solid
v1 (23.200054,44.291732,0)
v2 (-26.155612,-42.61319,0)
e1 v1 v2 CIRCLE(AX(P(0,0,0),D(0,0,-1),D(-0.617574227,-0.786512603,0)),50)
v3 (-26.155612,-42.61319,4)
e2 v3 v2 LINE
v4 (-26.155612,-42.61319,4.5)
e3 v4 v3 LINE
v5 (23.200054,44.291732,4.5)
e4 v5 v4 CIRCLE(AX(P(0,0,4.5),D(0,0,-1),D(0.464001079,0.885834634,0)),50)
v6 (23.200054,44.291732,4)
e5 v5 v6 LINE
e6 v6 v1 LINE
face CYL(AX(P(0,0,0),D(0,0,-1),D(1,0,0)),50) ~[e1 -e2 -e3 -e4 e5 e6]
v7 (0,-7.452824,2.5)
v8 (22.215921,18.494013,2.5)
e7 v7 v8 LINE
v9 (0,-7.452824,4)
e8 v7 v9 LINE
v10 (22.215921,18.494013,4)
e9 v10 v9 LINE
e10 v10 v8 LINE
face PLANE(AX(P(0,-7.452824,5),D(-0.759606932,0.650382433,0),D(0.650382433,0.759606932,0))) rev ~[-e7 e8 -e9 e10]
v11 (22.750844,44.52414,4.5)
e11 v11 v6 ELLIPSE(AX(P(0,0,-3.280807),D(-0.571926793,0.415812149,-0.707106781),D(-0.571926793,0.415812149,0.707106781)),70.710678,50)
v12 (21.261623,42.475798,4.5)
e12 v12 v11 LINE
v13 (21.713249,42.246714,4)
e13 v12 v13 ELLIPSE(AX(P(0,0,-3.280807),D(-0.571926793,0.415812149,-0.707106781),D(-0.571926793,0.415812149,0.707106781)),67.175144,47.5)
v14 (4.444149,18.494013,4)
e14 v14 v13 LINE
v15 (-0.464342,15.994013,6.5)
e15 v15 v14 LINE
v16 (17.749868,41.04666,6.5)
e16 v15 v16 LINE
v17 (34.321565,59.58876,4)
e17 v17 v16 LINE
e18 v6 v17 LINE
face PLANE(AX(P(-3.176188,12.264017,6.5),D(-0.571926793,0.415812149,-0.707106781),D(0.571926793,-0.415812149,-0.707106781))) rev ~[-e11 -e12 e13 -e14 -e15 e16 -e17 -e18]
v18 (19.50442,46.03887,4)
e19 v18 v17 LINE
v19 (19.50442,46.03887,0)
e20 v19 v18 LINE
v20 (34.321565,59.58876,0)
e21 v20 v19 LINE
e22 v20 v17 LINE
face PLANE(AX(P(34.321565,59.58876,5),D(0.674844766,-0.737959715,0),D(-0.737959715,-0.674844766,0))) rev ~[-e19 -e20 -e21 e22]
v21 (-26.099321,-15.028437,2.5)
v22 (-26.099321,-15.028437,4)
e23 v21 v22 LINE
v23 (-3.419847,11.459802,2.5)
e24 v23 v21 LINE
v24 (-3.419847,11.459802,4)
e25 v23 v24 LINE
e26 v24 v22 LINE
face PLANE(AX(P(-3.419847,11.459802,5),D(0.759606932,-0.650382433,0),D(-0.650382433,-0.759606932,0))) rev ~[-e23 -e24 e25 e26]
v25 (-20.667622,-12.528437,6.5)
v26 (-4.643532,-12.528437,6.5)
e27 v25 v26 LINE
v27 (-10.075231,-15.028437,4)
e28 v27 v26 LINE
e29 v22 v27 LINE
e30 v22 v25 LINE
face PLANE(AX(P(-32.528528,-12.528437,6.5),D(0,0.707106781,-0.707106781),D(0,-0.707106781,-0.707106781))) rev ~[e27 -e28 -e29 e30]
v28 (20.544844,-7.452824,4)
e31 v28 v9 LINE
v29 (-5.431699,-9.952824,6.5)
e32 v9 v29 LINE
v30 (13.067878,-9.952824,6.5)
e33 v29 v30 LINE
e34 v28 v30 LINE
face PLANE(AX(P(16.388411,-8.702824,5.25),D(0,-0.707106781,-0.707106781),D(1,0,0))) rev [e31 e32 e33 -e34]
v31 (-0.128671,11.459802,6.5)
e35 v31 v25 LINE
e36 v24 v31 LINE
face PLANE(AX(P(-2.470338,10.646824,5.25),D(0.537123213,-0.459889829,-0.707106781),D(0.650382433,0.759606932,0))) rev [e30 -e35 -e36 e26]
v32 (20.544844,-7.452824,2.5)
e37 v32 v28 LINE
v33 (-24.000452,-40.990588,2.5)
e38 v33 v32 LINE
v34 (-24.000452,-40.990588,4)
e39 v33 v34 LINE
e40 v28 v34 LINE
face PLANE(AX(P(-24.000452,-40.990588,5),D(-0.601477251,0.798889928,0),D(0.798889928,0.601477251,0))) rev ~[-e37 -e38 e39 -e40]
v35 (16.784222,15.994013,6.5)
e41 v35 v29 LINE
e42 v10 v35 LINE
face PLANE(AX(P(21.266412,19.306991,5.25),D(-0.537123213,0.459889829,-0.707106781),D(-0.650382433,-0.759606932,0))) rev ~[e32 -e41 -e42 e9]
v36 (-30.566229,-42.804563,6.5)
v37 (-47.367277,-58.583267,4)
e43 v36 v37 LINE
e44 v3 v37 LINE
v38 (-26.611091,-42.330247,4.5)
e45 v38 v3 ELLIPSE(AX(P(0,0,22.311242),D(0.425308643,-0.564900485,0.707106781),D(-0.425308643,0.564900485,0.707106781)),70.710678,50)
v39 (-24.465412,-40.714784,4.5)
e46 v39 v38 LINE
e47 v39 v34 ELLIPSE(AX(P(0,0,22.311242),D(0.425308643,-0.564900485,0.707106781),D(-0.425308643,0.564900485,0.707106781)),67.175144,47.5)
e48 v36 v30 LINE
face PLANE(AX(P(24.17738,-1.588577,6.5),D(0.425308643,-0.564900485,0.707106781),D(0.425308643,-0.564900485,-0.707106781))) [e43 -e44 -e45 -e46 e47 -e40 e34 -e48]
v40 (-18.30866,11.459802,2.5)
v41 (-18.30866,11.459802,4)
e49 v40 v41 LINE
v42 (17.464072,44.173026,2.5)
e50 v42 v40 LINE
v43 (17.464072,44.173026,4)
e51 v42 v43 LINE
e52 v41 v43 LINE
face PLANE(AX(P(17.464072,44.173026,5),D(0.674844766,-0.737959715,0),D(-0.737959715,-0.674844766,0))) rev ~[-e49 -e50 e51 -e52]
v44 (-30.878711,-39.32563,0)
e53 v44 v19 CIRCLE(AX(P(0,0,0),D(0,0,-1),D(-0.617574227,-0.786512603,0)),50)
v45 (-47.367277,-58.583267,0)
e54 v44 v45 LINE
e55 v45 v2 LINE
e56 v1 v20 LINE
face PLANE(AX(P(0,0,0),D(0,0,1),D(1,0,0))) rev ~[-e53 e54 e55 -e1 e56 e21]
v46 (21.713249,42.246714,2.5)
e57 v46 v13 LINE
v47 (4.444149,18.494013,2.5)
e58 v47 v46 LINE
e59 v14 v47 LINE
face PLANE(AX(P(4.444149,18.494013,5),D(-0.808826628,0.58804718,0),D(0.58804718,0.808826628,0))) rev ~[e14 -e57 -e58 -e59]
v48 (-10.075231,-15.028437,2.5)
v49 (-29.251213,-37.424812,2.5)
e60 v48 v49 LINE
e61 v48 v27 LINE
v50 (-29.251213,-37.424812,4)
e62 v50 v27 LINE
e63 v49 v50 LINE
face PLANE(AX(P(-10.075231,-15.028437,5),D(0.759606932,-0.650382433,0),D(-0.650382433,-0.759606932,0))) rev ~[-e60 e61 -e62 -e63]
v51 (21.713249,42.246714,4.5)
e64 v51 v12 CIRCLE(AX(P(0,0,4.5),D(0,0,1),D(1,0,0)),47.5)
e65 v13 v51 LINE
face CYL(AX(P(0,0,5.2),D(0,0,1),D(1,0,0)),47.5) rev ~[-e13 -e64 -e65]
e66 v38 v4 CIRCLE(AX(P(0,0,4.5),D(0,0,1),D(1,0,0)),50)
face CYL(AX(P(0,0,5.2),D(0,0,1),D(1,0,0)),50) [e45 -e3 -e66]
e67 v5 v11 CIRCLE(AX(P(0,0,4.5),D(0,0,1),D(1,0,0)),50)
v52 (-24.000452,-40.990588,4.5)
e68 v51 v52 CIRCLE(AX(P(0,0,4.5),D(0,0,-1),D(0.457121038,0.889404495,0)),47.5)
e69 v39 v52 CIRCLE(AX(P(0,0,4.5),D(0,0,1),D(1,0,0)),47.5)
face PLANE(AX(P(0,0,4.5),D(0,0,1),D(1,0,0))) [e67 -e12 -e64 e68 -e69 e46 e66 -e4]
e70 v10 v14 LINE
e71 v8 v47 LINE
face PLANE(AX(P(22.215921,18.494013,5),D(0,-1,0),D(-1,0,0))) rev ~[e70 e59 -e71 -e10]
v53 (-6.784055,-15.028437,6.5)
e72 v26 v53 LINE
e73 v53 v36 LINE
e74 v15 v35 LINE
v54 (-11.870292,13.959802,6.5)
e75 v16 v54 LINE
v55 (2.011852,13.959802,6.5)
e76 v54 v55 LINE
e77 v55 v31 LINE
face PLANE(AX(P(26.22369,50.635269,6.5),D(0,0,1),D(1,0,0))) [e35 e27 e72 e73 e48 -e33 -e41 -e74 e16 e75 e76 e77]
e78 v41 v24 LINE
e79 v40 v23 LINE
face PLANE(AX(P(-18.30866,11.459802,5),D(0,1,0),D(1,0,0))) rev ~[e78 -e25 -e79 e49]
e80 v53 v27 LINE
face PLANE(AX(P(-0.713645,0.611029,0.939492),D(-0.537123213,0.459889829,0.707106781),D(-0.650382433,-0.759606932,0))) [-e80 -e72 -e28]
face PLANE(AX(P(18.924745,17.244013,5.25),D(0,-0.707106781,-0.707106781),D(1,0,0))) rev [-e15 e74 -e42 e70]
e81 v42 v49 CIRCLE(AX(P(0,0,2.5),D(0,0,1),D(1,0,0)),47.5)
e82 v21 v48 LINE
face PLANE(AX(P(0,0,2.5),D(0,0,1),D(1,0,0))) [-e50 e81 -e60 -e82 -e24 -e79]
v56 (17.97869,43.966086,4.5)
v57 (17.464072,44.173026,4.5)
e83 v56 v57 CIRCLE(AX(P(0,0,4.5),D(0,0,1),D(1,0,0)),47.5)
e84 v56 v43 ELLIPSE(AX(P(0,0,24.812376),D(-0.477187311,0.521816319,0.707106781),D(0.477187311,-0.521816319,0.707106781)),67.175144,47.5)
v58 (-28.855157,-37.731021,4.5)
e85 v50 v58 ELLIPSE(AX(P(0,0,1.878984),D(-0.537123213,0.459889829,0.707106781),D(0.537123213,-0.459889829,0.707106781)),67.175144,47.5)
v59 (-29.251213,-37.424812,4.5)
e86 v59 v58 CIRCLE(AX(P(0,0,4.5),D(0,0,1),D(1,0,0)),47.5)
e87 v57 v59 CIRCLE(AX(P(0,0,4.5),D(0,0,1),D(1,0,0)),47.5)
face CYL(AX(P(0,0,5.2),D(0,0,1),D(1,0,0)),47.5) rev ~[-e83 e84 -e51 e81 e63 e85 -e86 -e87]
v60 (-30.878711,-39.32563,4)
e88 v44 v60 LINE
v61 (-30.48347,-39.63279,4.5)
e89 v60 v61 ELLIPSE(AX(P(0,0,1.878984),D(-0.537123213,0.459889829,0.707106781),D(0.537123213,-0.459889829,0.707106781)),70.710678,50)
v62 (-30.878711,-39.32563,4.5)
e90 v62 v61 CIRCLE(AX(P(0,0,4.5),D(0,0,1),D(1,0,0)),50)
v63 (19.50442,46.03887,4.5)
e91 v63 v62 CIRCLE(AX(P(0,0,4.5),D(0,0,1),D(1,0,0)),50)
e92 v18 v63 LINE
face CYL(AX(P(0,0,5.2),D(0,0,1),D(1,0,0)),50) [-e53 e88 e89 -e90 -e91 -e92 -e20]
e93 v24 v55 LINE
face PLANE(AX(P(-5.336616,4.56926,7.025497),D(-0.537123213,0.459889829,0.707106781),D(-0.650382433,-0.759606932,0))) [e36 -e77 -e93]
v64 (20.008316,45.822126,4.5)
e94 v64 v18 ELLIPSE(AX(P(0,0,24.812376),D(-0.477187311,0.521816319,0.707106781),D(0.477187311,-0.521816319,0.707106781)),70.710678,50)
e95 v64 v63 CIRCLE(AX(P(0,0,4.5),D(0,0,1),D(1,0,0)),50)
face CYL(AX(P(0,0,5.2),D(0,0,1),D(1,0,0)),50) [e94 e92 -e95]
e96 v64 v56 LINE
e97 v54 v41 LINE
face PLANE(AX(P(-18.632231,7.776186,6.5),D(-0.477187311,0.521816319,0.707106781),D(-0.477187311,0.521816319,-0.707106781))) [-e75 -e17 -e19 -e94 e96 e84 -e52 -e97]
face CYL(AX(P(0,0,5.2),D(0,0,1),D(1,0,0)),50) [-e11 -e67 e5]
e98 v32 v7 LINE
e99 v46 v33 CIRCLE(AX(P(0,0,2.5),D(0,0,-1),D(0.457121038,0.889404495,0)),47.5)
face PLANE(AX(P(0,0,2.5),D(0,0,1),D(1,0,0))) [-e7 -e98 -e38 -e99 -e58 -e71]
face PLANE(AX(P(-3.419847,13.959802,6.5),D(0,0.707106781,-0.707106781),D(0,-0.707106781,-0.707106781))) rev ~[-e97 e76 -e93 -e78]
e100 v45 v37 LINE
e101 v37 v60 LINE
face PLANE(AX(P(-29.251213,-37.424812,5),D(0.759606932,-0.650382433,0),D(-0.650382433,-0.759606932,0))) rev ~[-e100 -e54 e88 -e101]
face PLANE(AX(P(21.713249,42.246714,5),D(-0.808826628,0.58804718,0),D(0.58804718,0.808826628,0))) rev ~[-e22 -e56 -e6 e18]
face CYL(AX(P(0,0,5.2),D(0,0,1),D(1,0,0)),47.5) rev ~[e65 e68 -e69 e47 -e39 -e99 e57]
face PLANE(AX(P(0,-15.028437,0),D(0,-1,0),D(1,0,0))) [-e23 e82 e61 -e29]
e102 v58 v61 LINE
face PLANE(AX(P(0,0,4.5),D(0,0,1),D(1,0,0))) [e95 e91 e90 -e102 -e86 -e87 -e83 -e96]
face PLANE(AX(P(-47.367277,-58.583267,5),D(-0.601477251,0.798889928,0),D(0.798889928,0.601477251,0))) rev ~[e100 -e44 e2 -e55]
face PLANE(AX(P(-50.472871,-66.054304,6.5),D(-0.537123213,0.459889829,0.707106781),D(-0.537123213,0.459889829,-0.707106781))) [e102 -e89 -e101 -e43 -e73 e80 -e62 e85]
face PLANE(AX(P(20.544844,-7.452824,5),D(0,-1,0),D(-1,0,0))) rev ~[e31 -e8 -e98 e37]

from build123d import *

# Parameters (mm, degrees)
F0_R          = 47.5
F1_DEPTH      = 2.5
F0_R_2        = 50
F2_DEPTH      = 4.5
F4_DEPTH      = 2.5
F5_DEPTH      = 2.5
F6_DEPTH      = 2.5
F7_DEPTH      = 2.5
F8_DEPTH      = 2.5
F9_DEPTH      = 1.5
F10_T4_DEPTH  = 97.8665217368
F10_S5_R      = 47.5
F10_T6_DEPTH  = 52
F10_T11_DEPTH = 97.8665217368
F10_S12_R     = 47.5
F10_T13_DEPTH = 52
F10_T18_DEPTH = 97.8665217368
F10_S19_R     = 47.5
F10_T20_DEPTH = 52
F10_S22_R     = 50
F10_T23_DEPTH = 52
F10_T27_DEPTH = 97.8665217368
F10_S29_R     = 50
F10_T30_DEPTH = 52
F10_T34_DEPTH = 97.8665217368
F10_S36_R     = 50
F10_T37_DEPTH = 52
F11_T4_DEPTH  = 71.4627253186
F11_S6_R      = 50
F11_T7_DEPTH  = 38
F11_T11_DEPTH = 71.4627253186
F11_S13_R     = 50
F11_T14_DEPTH = 38
F11_T18_DEPTH = 71.4627253186
F11_S19_R     = 47.5
F11_T20_DEPTH = 38
F11_S22_R     = 50
F11_T23_DEPTH = 38
F11_T27_DEPTH = 71.4627253186
F11_S29_R     = 47.5
F11_T30_DEPTH = 38
F11_T35_DEPTH = 71.4627253186
F11_S37_R     = 47.5
F11_T38_DEPTH = 38
F12_SIZE      = 2.5
F13_T4_DEPTH  = 32.1736802215
F13_T9_DEPTH  = 32.1736802215
F14_SIZE      = 2.5
F15_SIZE      = 2.5
F16_T1_DEPTH  = 21.3180204906
F16_T6_DEPTH  = 9.7203833333
F17_SIZE      = 2.5
F18_T4_DEPTH  = 80.4724206
F18_S5_R      = 47.5
F18_T6_DEPTH  = 43
F18_T11_DEPTH = 80.4724206
F18_S12_R     = 47.5
F18_T13_DEPTH = 43
F18_T18_DEPTH = 80.4724206
F18_S19_R     = 50
F18_T20_DEPTH = 43
F18_S21_R     = 47.5
F18_T22_DEPTH = 43
F18_T27_DEPTH = 80.4724206
F18_S28_R     = 50
F18_T29_DEPTH = 43
F18_T34_DEPTH = 80.4724206
F18_S35_R     = 50
F18_T36_DEPTH = 43
F19_T4_DEPTH  = 67.1181390524
F19_S5_R      = 47.5
F19_T6_DEPTH  = 36
F19_T11_DEPTH = 67.1181390524
F19_T17_DEPTH = 67.1181390524
F19_S18_R     = 50
F19_T19_DEPTH = 36


# Not quite as in the source:
# - a fillet or chamfer that OpenCascade refuses, or shapes differently, is made with other operations: its cross-section is extruded or revolved along the edge and cut away or added


with BuildPart() as f1:
    # F0 (on Top) → F1 (new body)
    with BuildSketch(Plane.XY):
        Circle(F0_R)
    extrude(amount=F1_DEPTH)

    # F0 (on Top) → F2 (join)
    with BuildSketch(Plane.XY):
        Circle(F0_R_2)
        Circle(F0_R, mode=Mode.SUBTRACT)
    extrude(amount=F2_DEPTH)

    # F3 (on face) → F4 (join)
    with BuildSketch(Plane.XY.offset(2.5)):
        with BuildLine():
            ThreePointArc((21.7132493209, 42.2467135281), (19.6123250887, 43.2620700454), (17.4640719677, 44.173025596))
            Line((17.4640719677, 44.173025596), (-18.3086600155, 11.4598022774))
            Line((-18.3086600155, 11.4598022774), (-3.4198469948, 11.4598022774))
            Line((-3.4198469948, 11.4598022774), (-26.0993205011, -15.0284366682))
            Line((-26.0993205011, -15.0284366682), (-10.0752310827, -15.0284366682))
            Line((-10.0752310827, -15.0284366682), (-29.2512131204, -37.4248117027))
            ThreePointArc((-29.2512131204, -37.4248117027), (-26.6854575008, -39.29550048), (-24.0004517017, -40.990588165))
            Line((-24.0004517017, -40.990588165), (20.5448437482, -7.452824153))
            Line((20.5448437482, -7.452824153), (0, -7.452824153))
            Line((0, -7.452824153), (22.2159207014, 18.4940134476))
            Line((22.2159207014, 18.4940134476), (4.4441488571, 18.4940134476))
            Line((4.4441488571, 18.4940134476), (21.7132493209, 42.2467135281))
        make_face()
    extrude(amount=F4_DEPTH)

    # F3 (on face) → F5 (join)
    with BuildSketch(Plane.XY.offset(2.5)):
        with BuildLine():
            ThreePointArc((-24.0004517017, -40.990588165), (-26.6854575008, -39.29550048), (-29.2512131204, -37.4248117027))
            Line((-29.2512131204, -37.4248117027), (-47.3672765296, -58.5832665585))
            Line((-47.3672765296, -58.5832665585), (-24.0004517017, -40.990588165))
        make_face()
    extrude(amount=F5_DEPTH)

    # F3 (on face) → F6 (join)
    with BuildSketch(Plane.XY.offset(2.5)):
        with BuildLine():
            Line((21.7132493209, 42.2467135281), (34.321565181, 59.5887601376))
            Line((34.321565181, 59.5887601376), (17.4640719677, 44.173025596))
            ThreePointArc((17.4640719677, 44.173025596), (19.6123250887, 43.2620700454), (21.7132493209, 42.2467135281))
        make_face()
    extrude(amount=F6_DEPTH)

    # F3 (on face) → F7 (join)
    with BuildSketch(Plane.XY.offset(2.5)):
        with BuildLine():
            ThreePointArc((-24.0004517017, -40.990588165), (-26.6854575008, -39.29550048), (-29.2512131204, -37.4248117027))
            Line((-29.2512131204, -37.4248117027), (-47.3672765296, -58.5832665585))
            Line((-47.3672765296, -58.5832665585), (-24.0004517017, -40.990588165))
        make_face()
    extrude(amount=-F7_DEPTH)

    # F3 (on face) → F8 (join)
    with BuildSketch(Plane.XY.offset(2.5)):
        with BuildLine():
            Line((21.7132493209, 42.2467135281), (34.321565181, 59.5887601376))
            Line((34.321565181, 59.5887601376), (17.4640719677, 44.173025596))
            ThreePointArc((17.4640719677, 44.173025596), (19.6123250887, 43.2620700454), (21.7132493209, 42.2467135281))
        make_face()
    extrude(amount=-F8_DEPTH)

    # F9 (add): a face of the model
    f9_faces = [f1.faces().sort_by_distance(p)[0] for p in [
        (-3.1603414311, -1.3488112802, 5),
    ]]
    extrude(f9_faces, amount=F9_DEPTH)

    # F10: chamfer of 2.5 on 1 edges, made by hand


with BuildPart() as f10_tool2:
    # F10_s3 → F10_t4 (new body)
    with BuildSketch(Plane(origin=(14.6672771585, 11.0428649103, 0), x_dir=(0, 0, 1), z_dir=(-0.7988899275, -0.6014772512, 0))):
        Polygon((6.5, -15.8112422913), (4, -18.3112422913), (6.5, -18.3112422913), align=None)
    extrude(amount=F10_T4_DEPTH)

    # F10_s5 → F10_t6 (intersect, symmetric)
    with BuildSketch(Plane.XY.offset(5.2)):
        Circle(F10_S5_R)
    extrude(amount=F10_T6_DEPTH, both=True, mode=Mode.INTERSECT)

    split(bisect_by=Plane.XY.offset(4.5), keep=Keep.TOP)


with BuildPart() as f1_1:
    add(f1.part)

    # F10_t1: cut F10_tool2
    add(f10_tool2.part, mode=Mode.SUBTRACT)


with BuildPart() as f10_tool9:
    # F10_s10 → F10_t11 (new body)
    with BuildSketch(Plane(origin=(14.6672771585, 11.0428649103, 0), x_dir=(0, 0, 1), z_dir=(-0.7988899275, -0.6014772512, 0))):
        Polygon((6.5, -15.8112422913), (4, -18.3112422913), (6.5, -18.3112422913), align=None)
    extrude(amount=F10_T11_DEPTH)

    # F10_s12 → F10_t13 (intersect, symmetric)
    with BuildSketch(Plane.XY.offset(5.2)):
        Circle(F10_S12_R)
    extrude(amount=F10_T13_DEPTH, both=True, mode=Mode.INTERSECT)

    split(bisect_by=Plane.XY.offset(4.5), keep=Keep.BOTTOM)


with BuildPart() as f1_2:
    add(f1_1.part)

    # F10_t8: cut F10_tool9
    add(f10_tool9.part, mode=Mode.SUBTRACT)


with BuildPart() as f10_tool16:
    # F10_s17 → F10_t18 (new body)
    with BuildSketch(Plane(origin=(14.6672771585, 11.0428649103, 0), x_dir=(0, 0, 1), z_dir=(-0.7988899275, -0.6014772512, 0))):
        Polygon((6.5, -15.8112422913), (4, -18.3112422913), (6.5, -18.3112422913), align=None)
    extrude(amount=F10_T18_DEPTH)

    # F10_s19 → F10_t20 (cut, symmetric)
    with BuildSketch(Plane.XY.offset(5.2)):
        Circle(F10_S19_R)
    extrude(amount=F10_T20_DEPTH, both=True, mode=Mode.SUBTRACT)

    split(bisect_by=Plane.XY.offset(4.5), keep=Keep.TOP)

    # F10_s22 → F10_t23 (intersect, symmetric)
    with BuildSketch(Plane.XY.offset(5.2)):
        Circle(F10_S22_R)
    extrude(amount=F10_T23_DEPTH, both=True, mode=Mode.INTERSECT)


with BuildPart() as f1_3:
    add(f1_2.part)

    # F10_t15: cut F10_tool16
    add(f10_tool16.part, mode=Mode.SUBTRACT)


with BuildPart() as f10_tool25:
    # F10_s26 → F10_t27 (new body)
    with BuildSketch(Plane(origin=(14.6672771585, 11.0428649103, 0), x_dir=(0, 0, 1), z_dir=(-0.7988899275, -0.6014772512, 0))):
        Polygon((6.5, -15.8112422913), (4, -18.3112422913), (6.5, -18.3112422913), align=None)
    extrude(amount=F10_T27_DEPTH)

    split(bisect_by=Plane.XY.offset(4.5), keep=Keep.TOP)

    # F10_s29 → F10_t30 (cut, symmetric)
    with BuildSketch(Plane.XY.offset(5.2)):
        Circle(F10_S29_R)
    extrude(amount=F10_T30_DEPTH, both=True, mode=Mode.SUBTRACT)


with BuildPart() as f1_4:
    add(f1_3.part)

    # F10_t24: cut F10_tool25
    add(f10_tool25.part, mode=Mode.SUBTRACT)


with BuildPart() as f10_tool32:
    # F10_s33 → F10_t34 (new body)
    with BuildSketch(Plane(origin=(14.6672771585, 11.0428649103, 0), x_dir=(0, 0, 1), z_dir=(-0.7988899275, -0.6014772512, 0))):
        Polygon((6.5, -15.8112422913), (4, -18.3112422913), (6.5, -18.3112422913), align=None)
    extrude(amount=F10_T34_DEPTH)

    split(bisect_by=Plane.XY.offset(4.5), keep=Keep.BOTTOM)

    # F10_s36 → F10_t37 (cut, symmetric)
    with BuildSketch(Plane.XY.offset(5.2)):
        Circle(F10_S36_R)
    extrude(amount=F10_T37_DEPTH, both=True, mode=Mode.SUBTRACT)


with BuildPart() as f1_5:
    add(f1_4.part)

    # F10_t31: cut F10_tool32
    add(f10_tool32.part, mode=Mode.SUBTRACT)

    # F11: chamfer of 2.5 on 1 edges, made by hand


with BuildPart() as f11_tool2:
    # F11_s3 → F11_t4 (new body)
    with BuildSketch(Plane(origin=(-53.9830269669, -63.0488761968, 0), x_dir=(0, 0, 1), z_dir=(0.6503824329, 0.7596069319, 0))):
        Polygon((6.5, 4.6210158312), (4, 2.1210158312), (6.5, 2.1210158312), align=None)
    extrude(amount=F11_T4_DEPTH)

    split(bisect_by=Plane.XY.offset(4.5), keep=Keep.TOP)

    # F11_s6 → F11_t7 (cut, symmetric)
    with BuildSketch(Plane.XY.offset(5.2)):
        Circle(F11_S6_R)
    extrude(amount=F11_T7_DEPTH, both=True, mode=Mode.SUBTRACT)


with BuildPart() as f1_6:
    add(f1_5.part)

    # F11_t1: cut F11_tool2
    add(f11_tool2.part, mode=Mode.SUBTRACT)


with BuildPart() as f11_tool9:
    # F11_s10 → F11_t11 (new body)
    with BuildSketch(Plane(origin=(-53.9830269669, -63.0488761968, 0), x_dir=(0, 0, 1), z_dir=(0.6503824329, 0.7596069319, 0))):
        Polygon((6.5, 4.6210158312), (4, 2.1210158312), (6.5, 2.1210158312), align=None)
    extrude(amount=F11_T11_DEPTH)

    split(bisect_by=Plane.XY.offset(4.5), keep=Keep.BOTTOM)

    # F11_s13 → F11_t14 (cut, symmetric)
    with BuildSketch(Plane.XY.offset(5.2)):
        Circle(F11_S13_R)
    extrude(amount=F11_T14_DEPTH, both=True, mode=Mode.SUBTRACT)


with BuildPart() as f1_7:
    add(f1_6.part)

    # F11_t8: cut F11_tool9
    add(f11_tool9.part, mode=Mode.SUBTRACT)


with BuildPart() as f11_tool16:
    # F11_s17 → F11_t18 (new body)
    with BuildSketch(Plane(origin=(-53.9830269669, -63.0488761968, 0), x_dir=(0, 0, 1), z_dir=(0.6503824329, 0.7596069319, 0))):
        Polygon((6.5, 4.6210158312), (4, 2.1210158312), (6.5, 2.1210158312), align=None)
    extrude(amount=F11_T18_DEPTH)

    # F11_s19 → F11_t20 (cut, symmetric)
    with BuildSketch(Plane.XY.offset(5.2)):
        Circle(F11_S19_R)
    extrude(amount=F11_T20_DEPTH, both=True, mode=Mode.SUBTRACT)

    split(bisect_by=Plane.XY.offset(4.5), keep=Keep.TOP)

    # F11_s22 → F11_t23 (intersect, symmetric)
    with BuildSketch(Plane.XY.offset(5.2)):
        Circle(F11_S22_R)
    extrude(amount=F11_T23_DEPTH, both=True, mode=Mode.INTERSECT)


with BuildPart() as f1_8:
    add(f1_7.part)

    # F11_t15: cut F11_tool16
    add(f11_tool16.part, mode=Mode.SUBTRACT)


with BuildPart() as f11_tool25:
    # F11_s26 → F11_t27 (new body)
    with BuildSketch(Plane(origin=(-53.9830269669, -63.0488761968, 0), x_dir=(0, 0, 1), z_dir=(0.6503824329, 0.7596069319, 0))):
        Polygon((6.5, 4.6210158312), (4, 2.1210158312), (6.5, 2.1210158312), align=None)
    extrude(amount=F11_T27_DEPTH)

    split(bisect_by=Plane.XZ.offset(15.0284366682), keep=Keep.TOP)

    # F11_s29 → F11_t30 (intersect, symmetric)
    with BuildSketch(Plane.XY.offset(5.2)):
        Circle(F11_S29_R)
    extrude(amount=F11_T30_DEPTH, both=True, mode=Mode.INTERSECT)

    split(bisect_by=Plane.XY.offset(4.5), keep=Keep.TOP)


with BuildPart() as f1_9:
    add(f1_8.part)

    # F11_t24: cut F11_tool25
    add(f11_tool25.part, mode=Mode.SUBTRACT)


with BuildPart() as f11_tool33:
    # F11_s34 → F11_t35 (new body)
    with BuildSketch(Plane(origin=(-53.9830269669, -63.0488761968, 0), x_dir=(0, 0, 1), z_dir=(0.6503824329, 0.7596069319, 0))):
        Polygon((6.5, 4.6210158312), (4, 2.1210158312), (6.5, 2.1210158312), align=None)
    extrude(amount=F11_T35_DEPTH)

    split(bisect_by=Plane.XZ.offset(15.0284366682), keep=Keep.TOP)

    # F11_s37 → F11_t38 (intersect, symmetric)
    with BuildSketch(Plane.XY.offset(5.2)):
        Circle(F11_S37_R)
    extrude(amount=F11_T38_DEPTH, both=True, mode=Mode.INTERSECT)

    split(bisect_by=Plane.XY.offset(4.5), keep=Keep.BOTTOM)


with BuildPart() as f1_10:
    add(f1_9.part)

    # F11_t32: cut F11_tool33
    add(f11_tool33.part, mode=Mode.SUBTRACT)

    # F12
    f12_edges = [f1_10.edges().sort_by_distance(p)[0] for p in [
        (8.194205, -7.452824, 6.5),
    ]]
    chamfer(f12_edges, length=F12_SIZE)

    # F13: chamfer of 2.5 on 1 edges, made by hand


with BuildPart() as f13_tool2:
    # F13_s3 → F13_t4 (new body)
    with BuildSketch(Plane.YZ.offset(-32.528527971)):
        Polygon((-12.5284366682, 6.5), (-15.0284366682, 4), (-15.0284366682, 6.5), align=None)
    extrude(amount=F13_T4_DEPTH)

    split(bisect_by=Plane(origin=(1.6111383281, -1.3794714365, 0), x_dir=(0, 0, 1), z_dir=(-0.7596069319, 0.6503824329, 0)), keep=Keep.TOP)


with BuildPart() as f1_11:
    add(f1_10.part)

    # F13_t1: cut F13_tool2
    add(f13_tool2.part, mode=Mode.SUBTRACT)


with BuildPart() as f13_tool7:
    # F13_s8 → F13_t9 (new body)
    with BuildSketch(Plane.YZ.offset(-32.528527971)):
        Polygon((-12.5284366682, 6.5), (-15.0284366682, 4), (-15.0284366682, 6.5), align=None)
    extrude(amount=F13_T9_DEPTH)

    split(bisect_by=Plane(origin=(-0.7136446998, 0.6110291475, 0.9394920844), x_dir=(-0.6503824329, -0.7596069319, 0), z_dir=(-0.5371232126, 0.4598898286, 0.7071067812)), keep=Keep.TOP)

    split(bisect_by=Plane(origin=(1.6111383281, -1.3794714365, 0), x_dir=(0, 0, 1), z_dir=(0.7596069319, -0.6503824329, 0)), keep=Keep.TOP)


with BuildPart() as f1_12:
    add(f1_11.part)

    # F13_t6: cut F13_tool7
    add(f13_tool7.part, mode=Mode.SUBTRACT)

    # F14
    f14_edges = [f1_12.edges().sort_by_distance(p)[0] for p in [
        (-13.689322, -0.534317, 6.5),
    ]]
    chamfer(f14_edges, length=F14_SIZE)

    # F15
    f15_edges = [f1_12.edges().sort_by_distance(p)[0] for p in [
        (10.037699, 4.270595, 6.5),
    ]]
    chamfer(f15_edges, length=F15_SIZE)

    # F16: chamfer of 2.5 on 1 edges, made by hand

    # F16_s2 → F16_t1 (cut)
    with BuildSketch(Plane.YZ.offset(-24.7378674854)):
        Polygon((13.9598022774, 6.5), (11.4598022774, 4), (11.4598022774, 6.5), align=None)
    extrude(amount=F16_T1_DEPTH, mode=Mode.SUBTRACT)


with BuildPart() as f16_tool4:
    # F16_s5 → F16_t6 (new body)
    with BuildSketch(Plane.YZ.offset(-3.4198469948)):
        Polygon((13.9598022774, 6.5), (11.4598022774, 4), (11.4598022774, 6.5), align=None)
    extrude(amount=F16_T6_DEPTH)

    split(bisect_by=Plane(origin=(-5.3366160576, 4.5692596907, 7.0254967843), x_dir=(-0.6503824329, -0.7596069319, 0), z_dir=(-0.5371232126, 0.4598898286, 0.7071067812)), keep=Keep.TOP)


with BuildPart() as f1_13:
    add(f1_12.part)

    # F16_t3: cut F16_tool4
    add(f16_tool4.part, mode=Mode.SUBTRACT)

    # F17
    f17_edges = [f1_13.edges().sort_by_distance(p)[0] for p in [
        (11.684447, 18.494013, 6.5),
    ]]
    chamfer(f17_edges, length=F17_SIZE)

    # F18: chamfer of 2.5 on 1 edges, made by hand


with BuildPart() as f18_tool2:
    # F18_s3 → F18_t4 (new body)
    with BuildSketch(Plane(origin=(-6.2742203903, -5.7376096652, 0), x_dir=(0, 0, 1), z_dir=(0.7379597151, 0.6748447665, 0))):
        Polygon((6.5, -18.3123758167), (4, -20.8123758167), (6.5, -20.8123758167), align=None)
    extrude(amount=F18_T4_DEPTH)

    # F18_s5 → F18_t6 (intersect, symmetric)
    with BuildSketch(Plane.XY.offset(5.2)):
        Circle(F18_S5_R)
    extrude(amount=F18_T6_DEPTH, both=True, mode=Mode.INTERSECT)

    split(bisect_by=Plane.XY.offset(4.5), keep=Keep.TOP)


with BuildPart() as f1_14:
    add(f1_13.part)

    # F18_t1: cut F18_tool2
    add(f18_tool2.part, mode=Mode.SUBTRACT)


with BuildPart() as f18_tool9:
    # F18_s10 → F18_t11 (new body)
    with BuildSketch(Plane(origin=(-6.2742203903, -5.7376096652, 0), x_dir=(0, 0, 1), z_dir=(0.7379597151, 0.6748447665, 0))):
        Polygon((6.5, -18.3123758167), (4, -20.8123758167), (6.5, -20.8123758167), align=None)
    extrude(amount=F18_T11_DEPTH)

    # F18_s12 → F18_t13 (intersect, symmetric)
    with BuildSketch(Plane.XY.offset(5.2)):
        Circle(F18_S12_R)
    extrude(amount=F18_T13_DEPTH, both=True, mode=Mode.INTERSECT)

    split(bisect_by=Plane.XY.offset(4.5), keep=Keep.BOTTOM)


with BuildPart() as f1_15:
    add(f1_14.part)

    # F18_t8: cut F18_tool9
    add(f18_tool9.part, mode=Mode.SUBTRACT)


with BuildPart() as f18_tool16:
    # F18_s17 → F18_t18 (new body)
    with BuildSketch(Plane(origin=(-6.2742203903, -5.7376096652, 0), x_dir=(0, 0, 1), z_dir=(0.7379597151, 0.6748447665, 0))):
        Polygon((6.5, -18.3123758167), (4, -20.8123758167), (6.5, -20.8123758167), align=None)
    extrude(amount=F18_T18_DEPTH)

    # F18_s19 → F18_t20 (intersect, symmetric)
    with BuildSketch(Plane.XY.offset(5.2)):
        Circle(F18_S19_R)
    extrude(amount=F18_T20_DEPTH, both=True, mode=Mode.INTERSECT)

    # F18_s21 → F18_t22 (cut, symmetric)
    with BuildSketch(Plane.XY.offset(5.2)):
        Circle(F18_S21_R)
    extrude(amount=F18_T22_DEPTH, both=True, mode=Mode.SUBTRACT)

    split(bisect_by=Plane.XY.offset(4.5), keep=Keep.TOP)


with BuildPart() as f1_16:
    add(f1_15.part)

    # F18_t15: cut F18_tool16
    add(f18_tool16.part, mode=Mode.SUBTRACT)


with BuildPart() as f18_tool25:
    # F18_s26 → F18_t27 (new body)
    with BuildSketch(Plane(origin=(-6.2742203903, -5.7376096652, 0), x_dir=(0, 0, 1), z_dir=(0.7379597151, 0.6748447665, 0))):
        Polygon((6.5, -18.3123758167), (4, -20.8123758167), (6.5, -20.8123758167), align=None)
    extrude(amount=F18_T27_DEPTH)

    # F18_s28 → F18_t29 (cut, symmetric)
    with BuildSketch(Plane.XY.offset(5.2)):
        Circle(F18_S28_R)
    extrude(amount=F18_T29_DEPTH, both=True, mode=Mode.SUBTRACT)

    split(bisect_by=Plane.XY.offset(4.5), keep=Keep.TOP)


with BuildPart() as f1_17:
    add(f1_16.part)

    # F18_t24: cut F18_tool25
    add(f18_tool25.part, mode=Mode.SUBTRACT)


with BuildPart() as f18_tool32:
    # F18_s33 → F18_t34 (new body)
    with BuildSketch(Plane(origin=(-6.2742203903, -5.7376096652, 0), x_dir=(0, 0, 1), z_dir=(0.7379597151, 0.6748447665, 0))):
        Polygon((6.5, -18.3123758167), (4, -20.8123758167), (6.5, -20.8123758167), align=None)
    extrude(amount=F18_T34_DEPTH)

    # F18_s35 → F18_t36 (cut, symmetric)
    with BuildSketch(Plane.XY.offset(5.2)):
        Circle(F18_S35_R)
    extrude(amount=F18_T36_DEPTH, both=True, mode=Mode.SUBTRACT)

    split(bisect_by=Plane.XY.offset(4.5), keep=Keep.BOTTOM)


with BuildPart() as f1_18:
    add(f1_17.part)

    # F18_t31: cut F18_tool32
    add(f18_tool32.part, mode=Mode.SUBTRACT)

    # F19: chamfer of 2.5 on 1 edges, made by hand


with BuildPart() as f19_tool2:
    # F19_s3 → F19_t4 (new body)
    with BuildSketch(Plane(origin=(4.73478831, 6.5124415083, 0), x_dir=(0, 0, 1), z_dir=(0.5880471799, 0.808826628, 0))):
        Polygon((6.5, -9.7808065182), (4, -7.2808065182), (6.5, -7.2808065182), align=None)
    extrude(amount=F19_T4_DEPTH)

    # F19_s5 → F19_t6 (intersect, symmetric)
    with BuildSketch(Plane.XY.offset(5.2)):
        Circle(F19_S5_R)
    extrude(amount=F19_T6_DEPTH, both=True, mode=Mode.INTERSECT)

    split(bisect_by=Plane(origin=(0, 11.2470067238, 11.2470067238), x_dir=(1, 0, 0), z_dir=(0, 0.7071067812, 0.7071067812)), keep=Keep.TOP)


with BuildPart() as f1_19:
    add(f1_18.part)

    # F19_t1: cut F19_tool2
    add(f19_tool2.part, mode=Mode.SUBTRACT)


with BuildPart() as f19_tool9:
    # F19_s10 → F19_t11 (new body)
    with BuildSketch(Plane(origin=(4.73478831, 6.5124415083, 0), x_dir=(0, 0, 1), z_dir=(0.5880471799, 0.808826628, 0))):
        Polygon((6.5, -9.7808065182), (4, -7.2808065182), (6.5, -7.2808065182), align=None)
    extrude(amount=F19_T11_DEPTH)

    split(bisect_by=Plane.XY.offset(4.5), keep=Keep.TOP)

    split(bisect_by=Plane(origin=(0, 11.2470067238, 11.2470067238), x_dir=(1, 0, 0), z_dir=(0, 0.7071067812, 0.7071067812)), keep=Keep.TOP)


with BuildPart() as f1_20:
    add(f1_19.part)

    # F19_t8: cut F19_tool9
    add(f19_tool9.part, mode=Mode.SUBTRACT)


with BuildPart() as f19_tool15:
    # F19_s16 → F19_t17 (new body)
    with BuildSketch(Plane(origin=(4.73478831, 6.5124415083, 0), x_dir=(0, 0, 1), z_dir=(0.5880471799, 0.808826628, 0))):
        Polygon((6.5, -9.7808065182), (4, -7.2808065182), (6.5, -7.2808065182), align=None)
    extrude(amount=F19_T17_DEPTH)

    # F19_s18 → F19_t19 (cut, symmetric)
    with BuildSketch(Plane.XY.offset(5.2)):
        Circle(F19_S18_R)
    extrude(amount=F19_T19_DEPTH, both=True, mode=Mode.SUBTRACT)


with BuildPart() as f1_21:
    add(f1_20.part)

    # F19_t14: cut F19_tool15
    add(f19_tool15.part, mode=Mode.SUBTRACT)


solid = f1_21.part
